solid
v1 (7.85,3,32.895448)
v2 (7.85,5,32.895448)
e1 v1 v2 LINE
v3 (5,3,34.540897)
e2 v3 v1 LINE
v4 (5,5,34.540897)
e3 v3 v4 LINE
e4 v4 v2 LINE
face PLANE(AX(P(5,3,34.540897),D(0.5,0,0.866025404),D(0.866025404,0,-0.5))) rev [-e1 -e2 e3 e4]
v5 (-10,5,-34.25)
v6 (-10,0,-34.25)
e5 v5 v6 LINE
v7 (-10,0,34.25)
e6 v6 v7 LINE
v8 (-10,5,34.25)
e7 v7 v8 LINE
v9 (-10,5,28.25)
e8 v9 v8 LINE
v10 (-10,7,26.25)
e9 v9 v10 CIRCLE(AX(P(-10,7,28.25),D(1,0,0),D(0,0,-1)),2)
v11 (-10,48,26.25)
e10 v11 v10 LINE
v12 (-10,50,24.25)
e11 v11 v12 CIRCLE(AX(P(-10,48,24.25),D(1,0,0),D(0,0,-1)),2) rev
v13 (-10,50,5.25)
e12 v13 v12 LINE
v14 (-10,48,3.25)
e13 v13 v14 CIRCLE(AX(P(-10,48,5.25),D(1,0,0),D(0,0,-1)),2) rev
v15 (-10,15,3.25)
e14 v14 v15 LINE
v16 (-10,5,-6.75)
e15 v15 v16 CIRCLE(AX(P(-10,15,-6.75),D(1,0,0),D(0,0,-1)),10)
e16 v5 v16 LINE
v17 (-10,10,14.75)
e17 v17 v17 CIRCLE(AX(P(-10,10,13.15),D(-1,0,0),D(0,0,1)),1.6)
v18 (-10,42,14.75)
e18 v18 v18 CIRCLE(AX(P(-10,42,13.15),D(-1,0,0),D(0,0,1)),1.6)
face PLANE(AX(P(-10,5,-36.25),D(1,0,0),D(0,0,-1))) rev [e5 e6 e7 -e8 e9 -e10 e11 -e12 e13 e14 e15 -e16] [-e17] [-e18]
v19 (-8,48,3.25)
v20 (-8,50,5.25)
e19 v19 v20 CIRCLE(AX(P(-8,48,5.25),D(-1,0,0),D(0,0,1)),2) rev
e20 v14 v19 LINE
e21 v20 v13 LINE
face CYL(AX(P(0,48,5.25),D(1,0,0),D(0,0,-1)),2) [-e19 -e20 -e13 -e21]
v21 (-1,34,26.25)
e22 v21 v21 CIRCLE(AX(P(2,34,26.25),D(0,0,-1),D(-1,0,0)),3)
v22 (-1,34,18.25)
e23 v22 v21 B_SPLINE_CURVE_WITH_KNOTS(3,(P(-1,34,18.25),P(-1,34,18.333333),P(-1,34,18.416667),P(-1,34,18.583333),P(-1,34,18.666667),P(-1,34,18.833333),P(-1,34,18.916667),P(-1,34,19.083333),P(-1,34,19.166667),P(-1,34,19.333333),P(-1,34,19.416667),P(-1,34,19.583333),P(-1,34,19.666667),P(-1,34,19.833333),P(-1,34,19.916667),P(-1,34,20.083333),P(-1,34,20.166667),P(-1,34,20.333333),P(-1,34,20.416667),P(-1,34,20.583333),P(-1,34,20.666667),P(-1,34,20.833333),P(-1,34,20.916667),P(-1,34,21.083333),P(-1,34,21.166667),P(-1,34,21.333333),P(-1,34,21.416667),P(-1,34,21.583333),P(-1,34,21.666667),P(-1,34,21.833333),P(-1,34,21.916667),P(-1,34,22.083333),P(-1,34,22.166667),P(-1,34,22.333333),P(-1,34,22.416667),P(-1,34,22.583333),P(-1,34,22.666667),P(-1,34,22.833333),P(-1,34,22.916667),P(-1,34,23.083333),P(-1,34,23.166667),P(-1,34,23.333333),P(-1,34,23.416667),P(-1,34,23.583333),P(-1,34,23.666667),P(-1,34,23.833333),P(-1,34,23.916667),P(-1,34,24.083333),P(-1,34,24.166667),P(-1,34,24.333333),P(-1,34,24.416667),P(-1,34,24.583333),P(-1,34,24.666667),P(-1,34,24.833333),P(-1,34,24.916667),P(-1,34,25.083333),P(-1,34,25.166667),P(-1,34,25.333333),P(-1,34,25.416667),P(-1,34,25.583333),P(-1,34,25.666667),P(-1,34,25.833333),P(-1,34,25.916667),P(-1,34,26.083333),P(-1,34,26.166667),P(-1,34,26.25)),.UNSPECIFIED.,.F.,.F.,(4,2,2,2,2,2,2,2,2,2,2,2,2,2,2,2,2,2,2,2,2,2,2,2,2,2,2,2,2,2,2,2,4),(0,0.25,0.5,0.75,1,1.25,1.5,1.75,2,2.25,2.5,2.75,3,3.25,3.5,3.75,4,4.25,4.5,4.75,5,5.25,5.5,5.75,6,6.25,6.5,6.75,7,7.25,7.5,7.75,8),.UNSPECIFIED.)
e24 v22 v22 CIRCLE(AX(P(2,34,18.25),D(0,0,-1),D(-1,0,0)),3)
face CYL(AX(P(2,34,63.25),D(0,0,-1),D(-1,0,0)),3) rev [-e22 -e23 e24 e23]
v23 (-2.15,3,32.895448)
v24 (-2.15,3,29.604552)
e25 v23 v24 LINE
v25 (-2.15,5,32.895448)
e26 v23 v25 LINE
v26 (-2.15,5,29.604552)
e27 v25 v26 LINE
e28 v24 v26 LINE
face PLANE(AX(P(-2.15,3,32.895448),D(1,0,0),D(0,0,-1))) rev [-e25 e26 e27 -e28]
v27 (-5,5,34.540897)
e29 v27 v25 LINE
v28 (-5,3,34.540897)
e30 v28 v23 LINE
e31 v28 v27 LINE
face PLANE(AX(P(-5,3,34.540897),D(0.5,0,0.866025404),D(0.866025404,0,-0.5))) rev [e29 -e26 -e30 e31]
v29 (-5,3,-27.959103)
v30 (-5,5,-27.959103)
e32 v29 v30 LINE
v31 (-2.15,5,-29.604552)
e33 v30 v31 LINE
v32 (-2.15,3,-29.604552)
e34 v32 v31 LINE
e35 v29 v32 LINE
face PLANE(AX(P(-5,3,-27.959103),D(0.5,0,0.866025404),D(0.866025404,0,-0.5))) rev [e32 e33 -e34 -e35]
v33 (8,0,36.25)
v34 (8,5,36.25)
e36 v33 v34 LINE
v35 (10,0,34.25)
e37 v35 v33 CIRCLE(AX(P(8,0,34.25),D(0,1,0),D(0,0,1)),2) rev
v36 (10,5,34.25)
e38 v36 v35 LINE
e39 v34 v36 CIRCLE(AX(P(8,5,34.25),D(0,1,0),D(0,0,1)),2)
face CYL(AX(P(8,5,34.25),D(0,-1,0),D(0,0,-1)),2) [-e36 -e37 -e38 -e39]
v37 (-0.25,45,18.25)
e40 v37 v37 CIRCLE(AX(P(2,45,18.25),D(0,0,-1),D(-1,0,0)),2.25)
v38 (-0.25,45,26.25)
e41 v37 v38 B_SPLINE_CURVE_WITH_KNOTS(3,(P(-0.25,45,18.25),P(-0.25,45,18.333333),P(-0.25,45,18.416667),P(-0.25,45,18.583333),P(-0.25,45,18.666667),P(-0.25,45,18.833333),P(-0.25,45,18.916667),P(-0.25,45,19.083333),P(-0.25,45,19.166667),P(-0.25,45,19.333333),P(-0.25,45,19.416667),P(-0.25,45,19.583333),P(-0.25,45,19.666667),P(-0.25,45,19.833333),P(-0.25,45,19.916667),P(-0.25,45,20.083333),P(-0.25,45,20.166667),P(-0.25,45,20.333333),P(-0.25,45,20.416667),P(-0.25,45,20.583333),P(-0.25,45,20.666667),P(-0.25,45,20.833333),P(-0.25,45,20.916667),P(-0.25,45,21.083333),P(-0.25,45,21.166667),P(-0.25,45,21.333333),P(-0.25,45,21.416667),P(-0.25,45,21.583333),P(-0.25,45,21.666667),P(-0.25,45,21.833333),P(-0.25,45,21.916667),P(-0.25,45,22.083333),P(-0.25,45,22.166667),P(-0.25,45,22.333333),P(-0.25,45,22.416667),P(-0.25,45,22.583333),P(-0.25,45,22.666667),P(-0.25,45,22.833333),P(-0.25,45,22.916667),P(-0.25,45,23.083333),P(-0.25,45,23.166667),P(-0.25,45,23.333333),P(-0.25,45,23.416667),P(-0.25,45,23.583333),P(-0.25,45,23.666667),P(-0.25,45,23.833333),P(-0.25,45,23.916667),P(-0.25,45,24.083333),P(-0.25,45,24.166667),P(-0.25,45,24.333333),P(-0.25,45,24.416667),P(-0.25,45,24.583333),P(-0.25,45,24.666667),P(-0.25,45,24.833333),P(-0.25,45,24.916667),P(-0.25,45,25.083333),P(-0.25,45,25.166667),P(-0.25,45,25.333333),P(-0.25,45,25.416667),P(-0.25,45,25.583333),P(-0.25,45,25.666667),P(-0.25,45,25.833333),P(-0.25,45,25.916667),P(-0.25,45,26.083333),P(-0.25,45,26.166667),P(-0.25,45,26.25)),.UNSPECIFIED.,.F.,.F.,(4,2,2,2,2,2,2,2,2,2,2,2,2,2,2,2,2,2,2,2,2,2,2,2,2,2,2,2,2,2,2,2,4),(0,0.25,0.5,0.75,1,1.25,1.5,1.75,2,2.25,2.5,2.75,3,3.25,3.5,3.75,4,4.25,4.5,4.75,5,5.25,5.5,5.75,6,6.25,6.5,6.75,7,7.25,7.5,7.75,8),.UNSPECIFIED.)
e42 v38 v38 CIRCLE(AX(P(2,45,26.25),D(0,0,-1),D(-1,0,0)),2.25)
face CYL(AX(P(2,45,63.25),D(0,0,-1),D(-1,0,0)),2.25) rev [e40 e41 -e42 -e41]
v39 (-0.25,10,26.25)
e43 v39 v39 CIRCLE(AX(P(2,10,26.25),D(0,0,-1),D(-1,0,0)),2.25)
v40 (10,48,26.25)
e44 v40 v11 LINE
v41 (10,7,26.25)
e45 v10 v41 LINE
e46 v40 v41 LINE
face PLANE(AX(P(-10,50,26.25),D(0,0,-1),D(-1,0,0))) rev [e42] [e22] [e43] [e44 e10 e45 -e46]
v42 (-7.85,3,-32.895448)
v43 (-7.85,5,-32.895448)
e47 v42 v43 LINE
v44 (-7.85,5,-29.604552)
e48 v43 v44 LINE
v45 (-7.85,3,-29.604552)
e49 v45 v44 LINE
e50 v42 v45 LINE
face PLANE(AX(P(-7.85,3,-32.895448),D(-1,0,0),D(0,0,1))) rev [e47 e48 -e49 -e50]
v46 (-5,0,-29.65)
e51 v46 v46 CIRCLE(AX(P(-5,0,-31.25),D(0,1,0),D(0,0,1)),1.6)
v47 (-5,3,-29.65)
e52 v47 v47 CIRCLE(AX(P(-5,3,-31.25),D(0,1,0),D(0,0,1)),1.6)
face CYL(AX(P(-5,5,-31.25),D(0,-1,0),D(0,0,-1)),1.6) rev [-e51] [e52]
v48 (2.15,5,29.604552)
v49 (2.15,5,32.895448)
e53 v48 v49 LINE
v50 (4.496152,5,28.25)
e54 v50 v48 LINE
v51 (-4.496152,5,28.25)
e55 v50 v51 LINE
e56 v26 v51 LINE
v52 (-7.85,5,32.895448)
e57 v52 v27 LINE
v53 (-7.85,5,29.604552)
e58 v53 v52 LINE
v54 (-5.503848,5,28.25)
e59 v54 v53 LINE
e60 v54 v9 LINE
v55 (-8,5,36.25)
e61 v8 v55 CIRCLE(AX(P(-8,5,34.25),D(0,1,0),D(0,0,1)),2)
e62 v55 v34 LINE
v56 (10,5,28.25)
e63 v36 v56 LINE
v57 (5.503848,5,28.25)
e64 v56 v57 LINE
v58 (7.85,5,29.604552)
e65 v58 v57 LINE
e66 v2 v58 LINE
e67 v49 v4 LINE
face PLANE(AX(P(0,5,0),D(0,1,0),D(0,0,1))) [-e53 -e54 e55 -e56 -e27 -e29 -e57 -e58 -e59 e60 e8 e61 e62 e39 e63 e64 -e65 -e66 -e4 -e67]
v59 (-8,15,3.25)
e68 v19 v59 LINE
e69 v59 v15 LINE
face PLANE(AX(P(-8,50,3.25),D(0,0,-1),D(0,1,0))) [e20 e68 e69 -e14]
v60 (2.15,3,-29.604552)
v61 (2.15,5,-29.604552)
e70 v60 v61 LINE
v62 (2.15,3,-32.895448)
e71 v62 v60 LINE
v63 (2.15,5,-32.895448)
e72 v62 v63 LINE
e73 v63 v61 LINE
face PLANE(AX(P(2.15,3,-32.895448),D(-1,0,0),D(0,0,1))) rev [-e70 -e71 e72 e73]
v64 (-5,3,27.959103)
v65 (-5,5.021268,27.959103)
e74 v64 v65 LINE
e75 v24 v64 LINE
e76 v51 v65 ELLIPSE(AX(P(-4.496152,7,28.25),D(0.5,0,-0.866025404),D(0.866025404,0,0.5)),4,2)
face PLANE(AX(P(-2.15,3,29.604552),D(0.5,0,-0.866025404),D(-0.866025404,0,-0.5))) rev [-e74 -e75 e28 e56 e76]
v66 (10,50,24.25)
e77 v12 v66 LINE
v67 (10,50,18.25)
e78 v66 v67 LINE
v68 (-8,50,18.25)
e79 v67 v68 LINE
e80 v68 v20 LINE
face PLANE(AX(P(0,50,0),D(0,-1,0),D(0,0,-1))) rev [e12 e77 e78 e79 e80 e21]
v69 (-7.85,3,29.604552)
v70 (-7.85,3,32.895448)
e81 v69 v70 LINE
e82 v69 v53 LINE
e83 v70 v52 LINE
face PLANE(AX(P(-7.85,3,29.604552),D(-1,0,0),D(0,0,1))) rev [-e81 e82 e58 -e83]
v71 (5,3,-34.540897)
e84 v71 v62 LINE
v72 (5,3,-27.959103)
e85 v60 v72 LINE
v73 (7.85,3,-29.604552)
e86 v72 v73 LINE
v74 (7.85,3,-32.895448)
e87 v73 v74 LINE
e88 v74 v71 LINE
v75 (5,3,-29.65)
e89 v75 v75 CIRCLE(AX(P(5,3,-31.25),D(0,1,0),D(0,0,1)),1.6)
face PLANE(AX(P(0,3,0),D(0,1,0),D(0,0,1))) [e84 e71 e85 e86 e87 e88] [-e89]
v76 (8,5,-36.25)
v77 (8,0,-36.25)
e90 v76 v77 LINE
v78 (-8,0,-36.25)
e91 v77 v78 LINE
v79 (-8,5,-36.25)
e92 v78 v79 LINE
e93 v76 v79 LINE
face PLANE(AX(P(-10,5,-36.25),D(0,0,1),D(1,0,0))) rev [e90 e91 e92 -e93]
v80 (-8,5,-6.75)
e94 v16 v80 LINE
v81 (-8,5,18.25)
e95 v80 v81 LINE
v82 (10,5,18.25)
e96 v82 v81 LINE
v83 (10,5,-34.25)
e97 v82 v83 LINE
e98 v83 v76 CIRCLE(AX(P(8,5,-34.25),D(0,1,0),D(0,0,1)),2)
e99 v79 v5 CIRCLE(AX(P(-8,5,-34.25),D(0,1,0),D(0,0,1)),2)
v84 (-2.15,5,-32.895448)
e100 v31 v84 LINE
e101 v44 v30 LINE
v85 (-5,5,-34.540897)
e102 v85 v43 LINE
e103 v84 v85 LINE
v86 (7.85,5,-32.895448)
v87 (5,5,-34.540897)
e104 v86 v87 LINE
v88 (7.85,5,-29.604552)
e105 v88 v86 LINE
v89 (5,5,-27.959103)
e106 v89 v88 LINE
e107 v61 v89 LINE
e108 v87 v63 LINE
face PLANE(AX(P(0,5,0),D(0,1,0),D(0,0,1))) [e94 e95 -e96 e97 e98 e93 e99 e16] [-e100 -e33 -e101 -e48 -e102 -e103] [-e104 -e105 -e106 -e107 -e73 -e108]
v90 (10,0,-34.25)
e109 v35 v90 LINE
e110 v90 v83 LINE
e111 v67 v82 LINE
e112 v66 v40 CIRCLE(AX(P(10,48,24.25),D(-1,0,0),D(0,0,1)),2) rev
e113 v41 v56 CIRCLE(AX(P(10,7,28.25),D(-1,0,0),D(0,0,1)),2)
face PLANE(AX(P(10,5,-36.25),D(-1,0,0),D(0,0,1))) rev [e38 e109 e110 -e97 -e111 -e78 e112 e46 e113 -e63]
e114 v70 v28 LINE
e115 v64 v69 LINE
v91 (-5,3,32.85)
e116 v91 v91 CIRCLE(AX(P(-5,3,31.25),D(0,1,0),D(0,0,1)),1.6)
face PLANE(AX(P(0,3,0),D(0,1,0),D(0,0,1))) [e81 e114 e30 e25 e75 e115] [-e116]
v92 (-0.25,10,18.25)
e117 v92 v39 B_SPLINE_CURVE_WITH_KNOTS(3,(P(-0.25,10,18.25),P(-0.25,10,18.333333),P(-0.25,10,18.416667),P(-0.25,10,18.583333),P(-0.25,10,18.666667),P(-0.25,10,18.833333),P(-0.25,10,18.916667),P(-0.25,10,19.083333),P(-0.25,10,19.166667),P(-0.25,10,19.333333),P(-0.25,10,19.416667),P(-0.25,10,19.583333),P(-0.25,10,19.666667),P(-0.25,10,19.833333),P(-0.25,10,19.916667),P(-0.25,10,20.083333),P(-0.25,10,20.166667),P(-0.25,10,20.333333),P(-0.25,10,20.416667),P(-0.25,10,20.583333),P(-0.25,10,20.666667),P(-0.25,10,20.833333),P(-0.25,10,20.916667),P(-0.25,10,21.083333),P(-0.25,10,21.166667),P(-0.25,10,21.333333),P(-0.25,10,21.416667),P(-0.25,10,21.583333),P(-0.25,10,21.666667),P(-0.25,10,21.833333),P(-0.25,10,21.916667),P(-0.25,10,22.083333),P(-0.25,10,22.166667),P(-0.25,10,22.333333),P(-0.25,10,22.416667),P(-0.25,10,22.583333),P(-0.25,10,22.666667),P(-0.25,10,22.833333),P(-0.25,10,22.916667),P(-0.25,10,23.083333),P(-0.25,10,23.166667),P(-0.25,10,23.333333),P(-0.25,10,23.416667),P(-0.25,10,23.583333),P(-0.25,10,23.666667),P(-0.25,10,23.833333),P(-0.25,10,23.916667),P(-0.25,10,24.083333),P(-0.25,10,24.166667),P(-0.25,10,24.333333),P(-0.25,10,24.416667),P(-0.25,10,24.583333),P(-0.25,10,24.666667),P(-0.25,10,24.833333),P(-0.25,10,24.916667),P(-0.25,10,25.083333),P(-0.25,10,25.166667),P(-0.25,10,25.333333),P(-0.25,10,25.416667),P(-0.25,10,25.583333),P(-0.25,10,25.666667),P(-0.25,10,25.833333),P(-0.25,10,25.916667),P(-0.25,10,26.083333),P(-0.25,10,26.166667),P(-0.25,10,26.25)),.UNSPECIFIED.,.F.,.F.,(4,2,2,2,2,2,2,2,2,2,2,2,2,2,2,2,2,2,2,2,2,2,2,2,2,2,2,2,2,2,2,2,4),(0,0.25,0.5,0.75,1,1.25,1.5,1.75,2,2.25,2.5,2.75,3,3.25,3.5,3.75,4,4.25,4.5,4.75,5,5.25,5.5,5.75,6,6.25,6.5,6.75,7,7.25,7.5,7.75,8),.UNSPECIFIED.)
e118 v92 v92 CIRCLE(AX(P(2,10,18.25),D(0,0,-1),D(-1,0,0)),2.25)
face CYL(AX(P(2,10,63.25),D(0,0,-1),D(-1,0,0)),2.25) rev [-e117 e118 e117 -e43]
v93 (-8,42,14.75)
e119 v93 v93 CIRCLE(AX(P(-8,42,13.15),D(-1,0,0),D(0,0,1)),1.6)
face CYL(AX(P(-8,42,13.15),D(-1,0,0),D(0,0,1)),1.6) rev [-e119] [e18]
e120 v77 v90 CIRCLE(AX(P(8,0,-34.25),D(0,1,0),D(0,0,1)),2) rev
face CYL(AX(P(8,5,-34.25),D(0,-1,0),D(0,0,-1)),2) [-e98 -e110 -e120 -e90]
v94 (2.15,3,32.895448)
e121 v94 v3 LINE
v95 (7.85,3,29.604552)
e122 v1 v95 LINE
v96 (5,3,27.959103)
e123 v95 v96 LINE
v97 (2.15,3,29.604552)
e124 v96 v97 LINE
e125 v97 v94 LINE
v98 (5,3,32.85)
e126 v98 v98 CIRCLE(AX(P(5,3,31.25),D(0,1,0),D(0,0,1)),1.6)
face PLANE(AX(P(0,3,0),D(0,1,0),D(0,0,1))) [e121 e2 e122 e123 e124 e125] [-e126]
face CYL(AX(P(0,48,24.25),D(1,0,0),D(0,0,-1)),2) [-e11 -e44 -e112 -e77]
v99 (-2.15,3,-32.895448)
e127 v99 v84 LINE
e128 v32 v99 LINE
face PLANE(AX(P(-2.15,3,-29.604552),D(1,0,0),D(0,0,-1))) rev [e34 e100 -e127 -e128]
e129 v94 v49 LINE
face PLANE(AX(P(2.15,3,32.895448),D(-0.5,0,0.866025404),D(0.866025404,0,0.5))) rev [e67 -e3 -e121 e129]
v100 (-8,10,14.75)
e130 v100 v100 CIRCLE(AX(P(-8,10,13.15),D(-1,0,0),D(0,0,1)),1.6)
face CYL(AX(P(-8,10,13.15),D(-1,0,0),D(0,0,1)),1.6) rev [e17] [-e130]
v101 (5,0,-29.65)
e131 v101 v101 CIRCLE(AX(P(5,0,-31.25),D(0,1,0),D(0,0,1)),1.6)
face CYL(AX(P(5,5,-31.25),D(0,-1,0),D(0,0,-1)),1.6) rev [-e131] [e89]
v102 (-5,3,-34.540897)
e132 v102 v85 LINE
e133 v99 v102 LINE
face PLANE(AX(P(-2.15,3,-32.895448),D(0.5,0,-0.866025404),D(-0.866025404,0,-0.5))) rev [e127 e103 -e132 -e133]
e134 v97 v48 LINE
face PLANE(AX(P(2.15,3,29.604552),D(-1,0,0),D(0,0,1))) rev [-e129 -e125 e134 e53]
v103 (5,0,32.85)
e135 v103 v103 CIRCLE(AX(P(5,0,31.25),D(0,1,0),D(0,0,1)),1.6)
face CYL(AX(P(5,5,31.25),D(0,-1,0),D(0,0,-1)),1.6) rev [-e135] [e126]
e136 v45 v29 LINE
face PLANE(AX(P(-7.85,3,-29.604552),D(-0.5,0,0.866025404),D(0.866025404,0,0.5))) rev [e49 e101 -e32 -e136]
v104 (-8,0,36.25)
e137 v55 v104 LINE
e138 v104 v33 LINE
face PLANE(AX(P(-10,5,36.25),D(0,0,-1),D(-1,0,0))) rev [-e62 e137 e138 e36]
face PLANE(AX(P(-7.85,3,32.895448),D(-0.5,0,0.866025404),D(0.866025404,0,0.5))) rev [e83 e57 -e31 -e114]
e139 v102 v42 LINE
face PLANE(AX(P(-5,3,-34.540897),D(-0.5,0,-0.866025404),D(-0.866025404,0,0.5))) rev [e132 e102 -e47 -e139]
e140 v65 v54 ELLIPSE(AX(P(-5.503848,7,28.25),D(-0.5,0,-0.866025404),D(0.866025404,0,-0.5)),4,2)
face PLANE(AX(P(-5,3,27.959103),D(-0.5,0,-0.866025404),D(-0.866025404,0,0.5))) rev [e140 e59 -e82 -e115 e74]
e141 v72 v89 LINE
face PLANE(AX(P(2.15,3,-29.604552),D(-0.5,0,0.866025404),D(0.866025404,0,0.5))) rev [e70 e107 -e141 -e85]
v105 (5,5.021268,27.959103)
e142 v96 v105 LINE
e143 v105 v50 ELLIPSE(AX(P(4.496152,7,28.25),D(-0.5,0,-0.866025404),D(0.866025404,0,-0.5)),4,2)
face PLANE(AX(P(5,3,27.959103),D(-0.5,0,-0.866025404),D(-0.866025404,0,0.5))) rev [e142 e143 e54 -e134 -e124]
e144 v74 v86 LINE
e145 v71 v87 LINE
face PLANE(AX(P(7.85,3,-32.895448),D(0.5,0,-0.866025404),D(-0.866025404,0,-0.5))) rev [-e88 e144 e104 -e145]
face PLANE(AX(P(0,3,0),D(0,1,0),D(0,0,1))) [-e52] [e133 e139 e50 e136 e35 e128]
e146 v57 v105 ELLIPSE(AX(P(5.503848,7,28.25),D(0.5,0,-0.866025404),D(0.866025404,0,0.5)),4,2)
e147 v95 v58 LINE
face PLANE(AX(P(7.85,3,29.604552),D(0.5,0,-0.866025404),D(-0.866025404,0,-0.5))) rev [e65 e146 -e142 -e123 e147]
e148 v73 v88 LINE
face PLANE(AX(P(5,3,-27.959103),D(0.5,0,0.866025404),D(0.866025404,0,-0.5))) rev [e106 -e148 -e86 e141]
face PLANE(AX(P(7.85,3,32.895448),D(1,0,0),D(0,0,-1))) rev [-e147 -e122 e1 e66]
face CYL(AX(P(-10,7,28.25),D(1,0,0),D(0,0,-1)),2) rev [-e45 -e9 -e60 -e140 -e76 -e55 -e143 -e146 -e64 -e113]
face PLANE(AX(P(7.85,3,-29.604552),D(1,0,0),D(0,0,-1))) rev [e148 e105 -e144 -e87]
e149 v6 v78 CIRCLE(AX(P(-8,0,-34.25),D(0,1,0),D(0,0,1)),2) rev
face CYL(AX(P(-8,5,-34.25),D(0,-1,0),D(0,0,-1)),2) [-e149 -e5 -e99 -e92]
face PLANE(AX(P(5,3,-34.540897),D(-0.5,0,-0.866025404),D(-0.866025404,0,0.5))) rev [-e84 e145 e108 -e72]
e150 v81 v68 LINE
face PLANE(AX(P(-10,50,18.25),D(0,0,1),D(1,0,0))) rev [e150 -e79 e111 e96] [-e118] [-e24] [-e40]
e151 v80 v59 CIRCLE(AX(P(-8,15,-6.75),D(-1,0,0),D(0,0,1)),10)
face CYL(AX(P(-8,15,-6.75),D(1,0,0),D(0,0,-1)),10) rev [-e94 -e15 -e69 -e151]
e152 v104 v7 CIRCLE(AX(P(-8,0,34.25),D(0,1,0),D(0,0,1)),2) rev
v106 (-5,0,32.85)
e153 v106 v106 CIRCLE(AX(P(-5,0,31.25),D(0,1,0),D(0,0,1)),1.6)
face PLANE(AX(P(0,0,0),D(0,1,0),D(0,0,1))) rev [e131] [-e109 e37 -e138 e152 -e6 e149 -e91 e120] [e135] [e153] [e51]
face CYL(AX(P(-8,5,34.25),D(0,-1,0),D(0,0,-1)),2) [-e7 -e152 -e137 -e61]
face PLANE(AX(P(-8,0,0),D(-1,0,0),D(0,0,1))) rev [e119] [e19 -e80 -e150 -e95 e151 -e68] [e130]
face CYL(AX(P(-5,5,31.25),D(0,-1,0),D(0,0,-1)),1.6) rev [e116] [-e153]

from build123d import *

# Parameters (mm, degrees)
CROQUIS1_W              = 20
CROQUIS1_H              = 72.5
CROQUIS1_R              = 1.6
SALIENTE_EXTRUIR1_DEPTH = 5
CORTAR_EXTRUIR1_DEPTH   = 2
CROQUIS3_W              = 20
CROQUIS3_H              = 8
SALIENTE_EXTRUIR2_DEPTH = 45
CROQUIS4_R              = 2.25
CROQUIS4_R_2            = 3
CORTAR_EXTRUIR2_DEPTH   = 45
CROQUIS5_W              = 15
CROQUIS5_H              = 45
CROQUIS5_R              = 1.6
SALIENTE_EXTRUIR3_DEPTH = 2
REDONDEO2_R             = 2
REDONDEO3_R             = 10


with BuildPart() as part:
    # Croquis1 → Saliente-Extruir1 (new body)
    with BuildSketch(Plane(origin=(0, 0, 0), x_dir=(1, 0, 0), z_dir=(0, 1, 0))):
        Rectangle(CROQUIS1_W, CROQUIS1_H)
        with Locations(Location((-5, 31.25, 0), (0, 0, 270))):
            Circle(CROQUIS1_R, mode=Mode.SUBTRACT)
        with Locations(Location((5, 31.25, 0), (0, 0, 270))):
            Circle(CROQUIS1_R, mode=Mode.SUBTRACT)
        with Locations(Location((-5, -31.25, 0), (0, 0, 270))):
            Circle(CROQUIS1_R, mode=Mode.SUBTRACT)
        with Locations(Location((5, -31.25, 0), (0, 0, 270))):
            Circle(CROQUIS1_R, mode=Mode.SUBTRACT)
    extrude(amount=SALIENTE_EXTRUIR1_DEPTH)

    # Croquis2 → Cortar-Extruir1 (cut)
    with BuildSketch(Plane(origin=(0, 5, 0), x_dir=(1, 0, 0), z_dir=(0, 1, 0))):
        Polygon((-2.15, 29.604551733), (-2.15, 32.895448267), (-5, 34.540896534), (-7.85, 32.895448267), (-7.85, 29.604551733), (-5, 27.959103466), align=None)
        Polygon((5, 27.959103466), (7.85, 29.604551733), (7.85, 32.895448267), (5, 34.540896534), (2.15, 32.895448267), (2.15, 29.604551733), align=None)
        Polygon((-5, -34.540896534), (-2.15, -32.895448267), (-2.15, -29.604551733), (-5, -27.959103466), (-7.85, -29.604551733), (-7.85, -32.895448267), align=None)
        Polygon((5, -27.959103466), (2.15, -29.604551733), (2.15, -32.895448267), (5, -34.540896534), (7.85, -32.895448267), (7.85, -29.604551733), align=None)
    extrude(amount=-CORTAR_EXTRUIR1_DEPTH, mode=Mode.SUBTRACT)

    # Croquis3 → Saliente-Extruir2 (add)
    with BuildSketch(Plane(origin=(0, 5, 0), x_dir=(1, 0, 0), z_dir=(0, 1, 0))):
        with Locations((0, -22.25)):
            Rectangle(CROQUIS3_W, CROQUIS3_H)
    extrude(amount=SALIENTE_EXTRUIR2_DEPTH)

    # Croquis4 → Cortar-Extruir2 (cut)
    with BuildSketch(Plane(origin=(0, 0, 18.25), x_dir=(-1, 0, 0), z_dir=(0, 0, -1))):
        with Locations((-2, 10)):
            Circle(CROQUIS4_R)
        with Locations((-2, 45)):
            Circle(CROQUIS4_R)
        with Locations((-2, 34)):
            Circle(CROQUIS4_R_2)
    extrude(amount=-CORTAR_EXTRUIR2_DEPTH, mode=Mode.SUBTRACT)

    # Croquis5 → Saliente-Extruir3 (add)
    with BuildSketch(Plane.ZY.offset(10)):
        with Locations((10.75, 27.5)):
            Rectangle(CROQUIS5_W, CROQUIS5_H)
        with Locations((13.15, 42)):
            Circle(CROQUIS5_R, mode=Mode.SUBTRACT)
        with Locations((13.15, 10)):
            Circle(CROQUIS5_R, mode=Mode.SUBTRACT)
    extrude(amount=-SALIENTE_EXTRUIR3_DEPTH)

    # Redondeo2
    # the kernel refuses this fillet: 2 mm, written as the material it adds along each edge
    with BuildSketch(Plane(origin=(-10, 5, 26.25), x_dir=(0, 1, 0), z_dir=(1, 0, 0))) as redondeo2_piece_1_section:
        with BuildLine():
            CenterArc((REDONDEO2_R, REDONDEO2_R), REDONDEO2_R, 180, 90)
            Line((0, REDONDEO2_R), (0, 0))
            Line((0, 0), (REDONDEO2_R, 0))
        make_face()
    redondeo2_piece_1 = extrude(amount=20, mode=Mode.PRIVATE)
    redondeo2_piece_1 = split(redondeo2_piece_1, bisect_by=Plane(origin=(-7.126844401, 5.386325592, 29.187037653), z_dir=(-0.4999999999999993, 0, -0.866025403784439)), keep=Keep.TOP, mode=Mode.PRIVATE)
    redondeo2_piece_1 = split(redondeo2_piece_1, bisect_by=Plane(origin=(-8.118654127, 5.386325592, 26.158547666), z_dir=(-0.49999999999999917, 0, 0.8660254037844392)), keep=Keep.TOP, mode=Mode.PRIVATE)
    add(redondeo2_piece_1)
    with BuildSketch(Plane(origin=(-10, 5, 26.25), x_dir=(0, 1, 0), z_dir=(1, 0, 0))) as redondeo2_piece_2_section:
        with BuildLine():
            CenterArc((REDONDEO2_R, REDONDEO2_R), REDONDEO2_R, 180, 90)
            Line((0, REDONDEO2_R), (0, 0))
            Line((0, 0), (REDONDEO2_R, 0))
        make_face()
    redondeo2_piece_2 = extrude(amount=20, mode=Mode.PRIVATE)
    redondeo2_piece_2 = split(redondeo2_piece_2, bisect_by=Plane(origin=(-4.392913505, 5.539408931, 27.608601914), z_dir=(-0.4999999999999993, 0, -0.866025403784439)), keep=Keep.TOP, mode=Mode.PRIVATE)
    redondeo2_piece_2 = split(redondeo2_piece_2, bisect_by=Plane(origin=(-5.607086495, 5.539408931, 27.608601914), z_dir=(0.49999999999999917, 0, -0.8660254037844392)), keep=Keep.TOP, mode=Mode.PRIVATE)
    add(redondeo2_piece_2)
    with BuildSketch(Plane(origin=(-10, 5, 26.25), x_dir=(0, 1, 0), z_dir=(1, 0, 0))) as redondeo2_piece_3_section:
        with BuildLine():
            CenterArc((REDONDEO2_R, REDONDEO2_R), REDONDEO2_R, 180, 90)
            Line((0, REDONDEO2_R), (0, 0))
            Line((0, 0), (REDONDEO2_R, 0))
        make_face()
    redondeo2_piece_3 = extrude(amount=20, mode=Mode.PRIVATE)
    redondeo2_piece_3 = split(redondeo2_piece_3, bisect_by=Plane(origin=(0.754095137, 5.386325592, 25.50772915), z_dir=(-0.4999999999999997, 0, 0.8660254037844388)), keep=Keep.TOP, mode=Mode.PRIVATE)
    redondeo2_piece_3 = split(redondeo2_piece_3, bisect_by=Plane(origin=(1.745904863, 5.386325592, 29.837856169), z_dir=(-0.5000000000000001, 0, -0.8660254037844386)), keep=Keep.TOP, mode=Mode.PRIVATE)
    redondeo2_piece_3 = split(redondeo2_piece_3, bisect_by=Plane(origin=(-0.754095137, 5.386325592, 25.50772915), z_dir=(0.4999999999999993, 0, 0.866025403784439)), keep=Keep.TOP, mode=Mode.PRIVATE)
    redondeo2_piece_3 = split(redondeo2_piece_3, bisect_by=Plane(origin=(-1.745904863, 5.386325592, 29.837856169), z_dir=(0.49999999999999917, 0, -0.8660254037844392)), keep=Keep.TOP, mode=Mode.PRIVATE)
    add(redondeo2_piece_3)
    with BuildSketch(Plane(origin=(-10, 5, 26.25), x_dir=(0, 1, 0), z_dir=(1, 0, 0))) as redondeo2_piece_4_section:
        with BuildLine():
            CenterArc((REDONDEO2_R, REDONDEO2_R), REDONDEO2_R, 180, 90)
            Line((0, REDONDEO2_R), (0, 0))
            Line((0, 0), (REDONDEO2_R, 0))
        make_face()
    redondeo2_piece_4 = extrude(amount=20, mode=Mode.PRIVATE)
    redondeo2_piece_4 = split(redondeo2_piece_4, bisect_by=Plane(origin=(4.392913505, 5.539408931, 27.608601914), z_dir=(0.4999999999999997, 0, -0.8660254037844388)), keep=Keep.TOP, mode=Mode.PRIVATE)
    redondeo2_piece_4 = split(redondeo2_piece_4, bisect_by=Plane(origin=(5.607086495, 5.539408931, 27.608601914), z_dir=(-0.5000000000000001, 0, -0.8660254037844386)), keep=Keep.TOP, mode=Mode.PRIVATE)
    add(redondeo2_piece_4)
    with BuildSketch(Plane(origin=(-10, 5, 26.25), x_dir=(0, 1, 0), z_dir=(1, 0, 0))) as redondeo2_piece_5_section:
        with BuildLine():
            CenterArc((REDONDEO2_R, REDONDEO2_R), REDONDEO2_R, 180, 90)
            Line((0, REDONDEO2_R), (0, 0))
            Line((0, 0), (REDONDEO2_R, 0))
        make_face()
    redondeo2_piece_5 = extrude(amount=20, mode=Mode.PRIVATE)
    redondeo2_piece_5 = split(redondeo2_piece_5, bisect_by=Plane(origin=(7.126844401, 5.386325592, 29.187037653), z_dir=(0.4999999999999997, 0, -0.8660254037844388)), keep=Keep.TOP, mode=Mode.PRIVATE)
    redondeo2_piece_5 = split(redondeo2_piece_5, bisect_by=Plane(origin=(8.118654127, 5.386325592, 26.158547666), z_dir=(0.5000000000000001, 0, 0.8660254037844386)), keep=Keep.TOP, mode=Mode.PRIVATE)
    add(redondeo2_piece_5)
    # the kernel refuses this fillet: 2 mm, written as the material it takes off along each edge
    with BuildSketch(Plane(origin=(-15, 50, 26.25), x_dir=(0, -1, 0), z_dir=(1, 0, 0))) as redondeo2_2_piece_1:
        with BuildLine():
            CenterArc((REDONDEO2_R, REDONDEO2_R), REDONDEO2_R, 180, 90)
            Line((0, REDONDEO2_R), (0, 0))
            Line((0, 0), (REDONDEO2_R, 0))
        make_face()
    extrude(amount=30, mode=Mode.SUBTRACT)
    with BuildSketch(Plane(origin=(-15, 50, 3.25), x_dir=(0, 0, 1), z_dir=(1, 0, 0))) as redondeo2_2_piece_2:
        with BuildLine():
            CenterArc((REDONDEO2_R, REDONDEO2_R), REDONDEO2_R, 180, 90)
            Line((0, REDONDEO2_R), (0, 0))
            Line((0, 0), (REDONDEO2_R, 0))
        make_face()
    extrude(amount=12, mode=Mode.SUBTRACT)
    with BuildSketch(Plane(origin=(-10, -5, -36.25), x_dir=(1, 0, 0), z_dir=(0, 1, 0)), Plane(origin=(10, -5, 36.25), x_dir=(-1, 0, 0), z_dir=(0, 1, 0))) as redondeo2_2_piece_3:
        with BuildLine():
            CenterArc((REDONDEO2_R, -REDONDEO2_R), REDONDEO2_R, 90, 90)
            Line((0, -REDONDEO2_R), (0, 0))
            Line((0, 0), (REDONDEO2_R, 0))
        make_face()
    extrude(amount=15, mode=Mode.SUBTRACT)
    with BuildSketch(Plane(origin=(10, -5, -36.25), x_dir=(-1, 0, 0), z_dir=(0, 1, 0)), Plane(origin=(-10, -5, 36.25), x_dir=(1, 0, 0), z_dir=(0, 1, 0))) as redondeo2_2_piece_4:
        with BuildLine():
            CenterArc((REDONDEO2_R, REDONDEO2_R), REDONDEO2_R, 180, 90)
            Line((0, REDONDEO2_R), (0, 0))
            Line((0, 0), (REDONDEO2_R, 0))
        make_face()
    extrude(amount=15, mode=Mode.SUBTRACT)

    # Redondeo3
    redondeo3_edges = [part.edges().sort_by_distance(p)[0] for p in [
        (-9, 5, 3.25),
    ]]
    fillet(redondeo3_edges, radius=REDONDEO3_R)


solid = part.part
